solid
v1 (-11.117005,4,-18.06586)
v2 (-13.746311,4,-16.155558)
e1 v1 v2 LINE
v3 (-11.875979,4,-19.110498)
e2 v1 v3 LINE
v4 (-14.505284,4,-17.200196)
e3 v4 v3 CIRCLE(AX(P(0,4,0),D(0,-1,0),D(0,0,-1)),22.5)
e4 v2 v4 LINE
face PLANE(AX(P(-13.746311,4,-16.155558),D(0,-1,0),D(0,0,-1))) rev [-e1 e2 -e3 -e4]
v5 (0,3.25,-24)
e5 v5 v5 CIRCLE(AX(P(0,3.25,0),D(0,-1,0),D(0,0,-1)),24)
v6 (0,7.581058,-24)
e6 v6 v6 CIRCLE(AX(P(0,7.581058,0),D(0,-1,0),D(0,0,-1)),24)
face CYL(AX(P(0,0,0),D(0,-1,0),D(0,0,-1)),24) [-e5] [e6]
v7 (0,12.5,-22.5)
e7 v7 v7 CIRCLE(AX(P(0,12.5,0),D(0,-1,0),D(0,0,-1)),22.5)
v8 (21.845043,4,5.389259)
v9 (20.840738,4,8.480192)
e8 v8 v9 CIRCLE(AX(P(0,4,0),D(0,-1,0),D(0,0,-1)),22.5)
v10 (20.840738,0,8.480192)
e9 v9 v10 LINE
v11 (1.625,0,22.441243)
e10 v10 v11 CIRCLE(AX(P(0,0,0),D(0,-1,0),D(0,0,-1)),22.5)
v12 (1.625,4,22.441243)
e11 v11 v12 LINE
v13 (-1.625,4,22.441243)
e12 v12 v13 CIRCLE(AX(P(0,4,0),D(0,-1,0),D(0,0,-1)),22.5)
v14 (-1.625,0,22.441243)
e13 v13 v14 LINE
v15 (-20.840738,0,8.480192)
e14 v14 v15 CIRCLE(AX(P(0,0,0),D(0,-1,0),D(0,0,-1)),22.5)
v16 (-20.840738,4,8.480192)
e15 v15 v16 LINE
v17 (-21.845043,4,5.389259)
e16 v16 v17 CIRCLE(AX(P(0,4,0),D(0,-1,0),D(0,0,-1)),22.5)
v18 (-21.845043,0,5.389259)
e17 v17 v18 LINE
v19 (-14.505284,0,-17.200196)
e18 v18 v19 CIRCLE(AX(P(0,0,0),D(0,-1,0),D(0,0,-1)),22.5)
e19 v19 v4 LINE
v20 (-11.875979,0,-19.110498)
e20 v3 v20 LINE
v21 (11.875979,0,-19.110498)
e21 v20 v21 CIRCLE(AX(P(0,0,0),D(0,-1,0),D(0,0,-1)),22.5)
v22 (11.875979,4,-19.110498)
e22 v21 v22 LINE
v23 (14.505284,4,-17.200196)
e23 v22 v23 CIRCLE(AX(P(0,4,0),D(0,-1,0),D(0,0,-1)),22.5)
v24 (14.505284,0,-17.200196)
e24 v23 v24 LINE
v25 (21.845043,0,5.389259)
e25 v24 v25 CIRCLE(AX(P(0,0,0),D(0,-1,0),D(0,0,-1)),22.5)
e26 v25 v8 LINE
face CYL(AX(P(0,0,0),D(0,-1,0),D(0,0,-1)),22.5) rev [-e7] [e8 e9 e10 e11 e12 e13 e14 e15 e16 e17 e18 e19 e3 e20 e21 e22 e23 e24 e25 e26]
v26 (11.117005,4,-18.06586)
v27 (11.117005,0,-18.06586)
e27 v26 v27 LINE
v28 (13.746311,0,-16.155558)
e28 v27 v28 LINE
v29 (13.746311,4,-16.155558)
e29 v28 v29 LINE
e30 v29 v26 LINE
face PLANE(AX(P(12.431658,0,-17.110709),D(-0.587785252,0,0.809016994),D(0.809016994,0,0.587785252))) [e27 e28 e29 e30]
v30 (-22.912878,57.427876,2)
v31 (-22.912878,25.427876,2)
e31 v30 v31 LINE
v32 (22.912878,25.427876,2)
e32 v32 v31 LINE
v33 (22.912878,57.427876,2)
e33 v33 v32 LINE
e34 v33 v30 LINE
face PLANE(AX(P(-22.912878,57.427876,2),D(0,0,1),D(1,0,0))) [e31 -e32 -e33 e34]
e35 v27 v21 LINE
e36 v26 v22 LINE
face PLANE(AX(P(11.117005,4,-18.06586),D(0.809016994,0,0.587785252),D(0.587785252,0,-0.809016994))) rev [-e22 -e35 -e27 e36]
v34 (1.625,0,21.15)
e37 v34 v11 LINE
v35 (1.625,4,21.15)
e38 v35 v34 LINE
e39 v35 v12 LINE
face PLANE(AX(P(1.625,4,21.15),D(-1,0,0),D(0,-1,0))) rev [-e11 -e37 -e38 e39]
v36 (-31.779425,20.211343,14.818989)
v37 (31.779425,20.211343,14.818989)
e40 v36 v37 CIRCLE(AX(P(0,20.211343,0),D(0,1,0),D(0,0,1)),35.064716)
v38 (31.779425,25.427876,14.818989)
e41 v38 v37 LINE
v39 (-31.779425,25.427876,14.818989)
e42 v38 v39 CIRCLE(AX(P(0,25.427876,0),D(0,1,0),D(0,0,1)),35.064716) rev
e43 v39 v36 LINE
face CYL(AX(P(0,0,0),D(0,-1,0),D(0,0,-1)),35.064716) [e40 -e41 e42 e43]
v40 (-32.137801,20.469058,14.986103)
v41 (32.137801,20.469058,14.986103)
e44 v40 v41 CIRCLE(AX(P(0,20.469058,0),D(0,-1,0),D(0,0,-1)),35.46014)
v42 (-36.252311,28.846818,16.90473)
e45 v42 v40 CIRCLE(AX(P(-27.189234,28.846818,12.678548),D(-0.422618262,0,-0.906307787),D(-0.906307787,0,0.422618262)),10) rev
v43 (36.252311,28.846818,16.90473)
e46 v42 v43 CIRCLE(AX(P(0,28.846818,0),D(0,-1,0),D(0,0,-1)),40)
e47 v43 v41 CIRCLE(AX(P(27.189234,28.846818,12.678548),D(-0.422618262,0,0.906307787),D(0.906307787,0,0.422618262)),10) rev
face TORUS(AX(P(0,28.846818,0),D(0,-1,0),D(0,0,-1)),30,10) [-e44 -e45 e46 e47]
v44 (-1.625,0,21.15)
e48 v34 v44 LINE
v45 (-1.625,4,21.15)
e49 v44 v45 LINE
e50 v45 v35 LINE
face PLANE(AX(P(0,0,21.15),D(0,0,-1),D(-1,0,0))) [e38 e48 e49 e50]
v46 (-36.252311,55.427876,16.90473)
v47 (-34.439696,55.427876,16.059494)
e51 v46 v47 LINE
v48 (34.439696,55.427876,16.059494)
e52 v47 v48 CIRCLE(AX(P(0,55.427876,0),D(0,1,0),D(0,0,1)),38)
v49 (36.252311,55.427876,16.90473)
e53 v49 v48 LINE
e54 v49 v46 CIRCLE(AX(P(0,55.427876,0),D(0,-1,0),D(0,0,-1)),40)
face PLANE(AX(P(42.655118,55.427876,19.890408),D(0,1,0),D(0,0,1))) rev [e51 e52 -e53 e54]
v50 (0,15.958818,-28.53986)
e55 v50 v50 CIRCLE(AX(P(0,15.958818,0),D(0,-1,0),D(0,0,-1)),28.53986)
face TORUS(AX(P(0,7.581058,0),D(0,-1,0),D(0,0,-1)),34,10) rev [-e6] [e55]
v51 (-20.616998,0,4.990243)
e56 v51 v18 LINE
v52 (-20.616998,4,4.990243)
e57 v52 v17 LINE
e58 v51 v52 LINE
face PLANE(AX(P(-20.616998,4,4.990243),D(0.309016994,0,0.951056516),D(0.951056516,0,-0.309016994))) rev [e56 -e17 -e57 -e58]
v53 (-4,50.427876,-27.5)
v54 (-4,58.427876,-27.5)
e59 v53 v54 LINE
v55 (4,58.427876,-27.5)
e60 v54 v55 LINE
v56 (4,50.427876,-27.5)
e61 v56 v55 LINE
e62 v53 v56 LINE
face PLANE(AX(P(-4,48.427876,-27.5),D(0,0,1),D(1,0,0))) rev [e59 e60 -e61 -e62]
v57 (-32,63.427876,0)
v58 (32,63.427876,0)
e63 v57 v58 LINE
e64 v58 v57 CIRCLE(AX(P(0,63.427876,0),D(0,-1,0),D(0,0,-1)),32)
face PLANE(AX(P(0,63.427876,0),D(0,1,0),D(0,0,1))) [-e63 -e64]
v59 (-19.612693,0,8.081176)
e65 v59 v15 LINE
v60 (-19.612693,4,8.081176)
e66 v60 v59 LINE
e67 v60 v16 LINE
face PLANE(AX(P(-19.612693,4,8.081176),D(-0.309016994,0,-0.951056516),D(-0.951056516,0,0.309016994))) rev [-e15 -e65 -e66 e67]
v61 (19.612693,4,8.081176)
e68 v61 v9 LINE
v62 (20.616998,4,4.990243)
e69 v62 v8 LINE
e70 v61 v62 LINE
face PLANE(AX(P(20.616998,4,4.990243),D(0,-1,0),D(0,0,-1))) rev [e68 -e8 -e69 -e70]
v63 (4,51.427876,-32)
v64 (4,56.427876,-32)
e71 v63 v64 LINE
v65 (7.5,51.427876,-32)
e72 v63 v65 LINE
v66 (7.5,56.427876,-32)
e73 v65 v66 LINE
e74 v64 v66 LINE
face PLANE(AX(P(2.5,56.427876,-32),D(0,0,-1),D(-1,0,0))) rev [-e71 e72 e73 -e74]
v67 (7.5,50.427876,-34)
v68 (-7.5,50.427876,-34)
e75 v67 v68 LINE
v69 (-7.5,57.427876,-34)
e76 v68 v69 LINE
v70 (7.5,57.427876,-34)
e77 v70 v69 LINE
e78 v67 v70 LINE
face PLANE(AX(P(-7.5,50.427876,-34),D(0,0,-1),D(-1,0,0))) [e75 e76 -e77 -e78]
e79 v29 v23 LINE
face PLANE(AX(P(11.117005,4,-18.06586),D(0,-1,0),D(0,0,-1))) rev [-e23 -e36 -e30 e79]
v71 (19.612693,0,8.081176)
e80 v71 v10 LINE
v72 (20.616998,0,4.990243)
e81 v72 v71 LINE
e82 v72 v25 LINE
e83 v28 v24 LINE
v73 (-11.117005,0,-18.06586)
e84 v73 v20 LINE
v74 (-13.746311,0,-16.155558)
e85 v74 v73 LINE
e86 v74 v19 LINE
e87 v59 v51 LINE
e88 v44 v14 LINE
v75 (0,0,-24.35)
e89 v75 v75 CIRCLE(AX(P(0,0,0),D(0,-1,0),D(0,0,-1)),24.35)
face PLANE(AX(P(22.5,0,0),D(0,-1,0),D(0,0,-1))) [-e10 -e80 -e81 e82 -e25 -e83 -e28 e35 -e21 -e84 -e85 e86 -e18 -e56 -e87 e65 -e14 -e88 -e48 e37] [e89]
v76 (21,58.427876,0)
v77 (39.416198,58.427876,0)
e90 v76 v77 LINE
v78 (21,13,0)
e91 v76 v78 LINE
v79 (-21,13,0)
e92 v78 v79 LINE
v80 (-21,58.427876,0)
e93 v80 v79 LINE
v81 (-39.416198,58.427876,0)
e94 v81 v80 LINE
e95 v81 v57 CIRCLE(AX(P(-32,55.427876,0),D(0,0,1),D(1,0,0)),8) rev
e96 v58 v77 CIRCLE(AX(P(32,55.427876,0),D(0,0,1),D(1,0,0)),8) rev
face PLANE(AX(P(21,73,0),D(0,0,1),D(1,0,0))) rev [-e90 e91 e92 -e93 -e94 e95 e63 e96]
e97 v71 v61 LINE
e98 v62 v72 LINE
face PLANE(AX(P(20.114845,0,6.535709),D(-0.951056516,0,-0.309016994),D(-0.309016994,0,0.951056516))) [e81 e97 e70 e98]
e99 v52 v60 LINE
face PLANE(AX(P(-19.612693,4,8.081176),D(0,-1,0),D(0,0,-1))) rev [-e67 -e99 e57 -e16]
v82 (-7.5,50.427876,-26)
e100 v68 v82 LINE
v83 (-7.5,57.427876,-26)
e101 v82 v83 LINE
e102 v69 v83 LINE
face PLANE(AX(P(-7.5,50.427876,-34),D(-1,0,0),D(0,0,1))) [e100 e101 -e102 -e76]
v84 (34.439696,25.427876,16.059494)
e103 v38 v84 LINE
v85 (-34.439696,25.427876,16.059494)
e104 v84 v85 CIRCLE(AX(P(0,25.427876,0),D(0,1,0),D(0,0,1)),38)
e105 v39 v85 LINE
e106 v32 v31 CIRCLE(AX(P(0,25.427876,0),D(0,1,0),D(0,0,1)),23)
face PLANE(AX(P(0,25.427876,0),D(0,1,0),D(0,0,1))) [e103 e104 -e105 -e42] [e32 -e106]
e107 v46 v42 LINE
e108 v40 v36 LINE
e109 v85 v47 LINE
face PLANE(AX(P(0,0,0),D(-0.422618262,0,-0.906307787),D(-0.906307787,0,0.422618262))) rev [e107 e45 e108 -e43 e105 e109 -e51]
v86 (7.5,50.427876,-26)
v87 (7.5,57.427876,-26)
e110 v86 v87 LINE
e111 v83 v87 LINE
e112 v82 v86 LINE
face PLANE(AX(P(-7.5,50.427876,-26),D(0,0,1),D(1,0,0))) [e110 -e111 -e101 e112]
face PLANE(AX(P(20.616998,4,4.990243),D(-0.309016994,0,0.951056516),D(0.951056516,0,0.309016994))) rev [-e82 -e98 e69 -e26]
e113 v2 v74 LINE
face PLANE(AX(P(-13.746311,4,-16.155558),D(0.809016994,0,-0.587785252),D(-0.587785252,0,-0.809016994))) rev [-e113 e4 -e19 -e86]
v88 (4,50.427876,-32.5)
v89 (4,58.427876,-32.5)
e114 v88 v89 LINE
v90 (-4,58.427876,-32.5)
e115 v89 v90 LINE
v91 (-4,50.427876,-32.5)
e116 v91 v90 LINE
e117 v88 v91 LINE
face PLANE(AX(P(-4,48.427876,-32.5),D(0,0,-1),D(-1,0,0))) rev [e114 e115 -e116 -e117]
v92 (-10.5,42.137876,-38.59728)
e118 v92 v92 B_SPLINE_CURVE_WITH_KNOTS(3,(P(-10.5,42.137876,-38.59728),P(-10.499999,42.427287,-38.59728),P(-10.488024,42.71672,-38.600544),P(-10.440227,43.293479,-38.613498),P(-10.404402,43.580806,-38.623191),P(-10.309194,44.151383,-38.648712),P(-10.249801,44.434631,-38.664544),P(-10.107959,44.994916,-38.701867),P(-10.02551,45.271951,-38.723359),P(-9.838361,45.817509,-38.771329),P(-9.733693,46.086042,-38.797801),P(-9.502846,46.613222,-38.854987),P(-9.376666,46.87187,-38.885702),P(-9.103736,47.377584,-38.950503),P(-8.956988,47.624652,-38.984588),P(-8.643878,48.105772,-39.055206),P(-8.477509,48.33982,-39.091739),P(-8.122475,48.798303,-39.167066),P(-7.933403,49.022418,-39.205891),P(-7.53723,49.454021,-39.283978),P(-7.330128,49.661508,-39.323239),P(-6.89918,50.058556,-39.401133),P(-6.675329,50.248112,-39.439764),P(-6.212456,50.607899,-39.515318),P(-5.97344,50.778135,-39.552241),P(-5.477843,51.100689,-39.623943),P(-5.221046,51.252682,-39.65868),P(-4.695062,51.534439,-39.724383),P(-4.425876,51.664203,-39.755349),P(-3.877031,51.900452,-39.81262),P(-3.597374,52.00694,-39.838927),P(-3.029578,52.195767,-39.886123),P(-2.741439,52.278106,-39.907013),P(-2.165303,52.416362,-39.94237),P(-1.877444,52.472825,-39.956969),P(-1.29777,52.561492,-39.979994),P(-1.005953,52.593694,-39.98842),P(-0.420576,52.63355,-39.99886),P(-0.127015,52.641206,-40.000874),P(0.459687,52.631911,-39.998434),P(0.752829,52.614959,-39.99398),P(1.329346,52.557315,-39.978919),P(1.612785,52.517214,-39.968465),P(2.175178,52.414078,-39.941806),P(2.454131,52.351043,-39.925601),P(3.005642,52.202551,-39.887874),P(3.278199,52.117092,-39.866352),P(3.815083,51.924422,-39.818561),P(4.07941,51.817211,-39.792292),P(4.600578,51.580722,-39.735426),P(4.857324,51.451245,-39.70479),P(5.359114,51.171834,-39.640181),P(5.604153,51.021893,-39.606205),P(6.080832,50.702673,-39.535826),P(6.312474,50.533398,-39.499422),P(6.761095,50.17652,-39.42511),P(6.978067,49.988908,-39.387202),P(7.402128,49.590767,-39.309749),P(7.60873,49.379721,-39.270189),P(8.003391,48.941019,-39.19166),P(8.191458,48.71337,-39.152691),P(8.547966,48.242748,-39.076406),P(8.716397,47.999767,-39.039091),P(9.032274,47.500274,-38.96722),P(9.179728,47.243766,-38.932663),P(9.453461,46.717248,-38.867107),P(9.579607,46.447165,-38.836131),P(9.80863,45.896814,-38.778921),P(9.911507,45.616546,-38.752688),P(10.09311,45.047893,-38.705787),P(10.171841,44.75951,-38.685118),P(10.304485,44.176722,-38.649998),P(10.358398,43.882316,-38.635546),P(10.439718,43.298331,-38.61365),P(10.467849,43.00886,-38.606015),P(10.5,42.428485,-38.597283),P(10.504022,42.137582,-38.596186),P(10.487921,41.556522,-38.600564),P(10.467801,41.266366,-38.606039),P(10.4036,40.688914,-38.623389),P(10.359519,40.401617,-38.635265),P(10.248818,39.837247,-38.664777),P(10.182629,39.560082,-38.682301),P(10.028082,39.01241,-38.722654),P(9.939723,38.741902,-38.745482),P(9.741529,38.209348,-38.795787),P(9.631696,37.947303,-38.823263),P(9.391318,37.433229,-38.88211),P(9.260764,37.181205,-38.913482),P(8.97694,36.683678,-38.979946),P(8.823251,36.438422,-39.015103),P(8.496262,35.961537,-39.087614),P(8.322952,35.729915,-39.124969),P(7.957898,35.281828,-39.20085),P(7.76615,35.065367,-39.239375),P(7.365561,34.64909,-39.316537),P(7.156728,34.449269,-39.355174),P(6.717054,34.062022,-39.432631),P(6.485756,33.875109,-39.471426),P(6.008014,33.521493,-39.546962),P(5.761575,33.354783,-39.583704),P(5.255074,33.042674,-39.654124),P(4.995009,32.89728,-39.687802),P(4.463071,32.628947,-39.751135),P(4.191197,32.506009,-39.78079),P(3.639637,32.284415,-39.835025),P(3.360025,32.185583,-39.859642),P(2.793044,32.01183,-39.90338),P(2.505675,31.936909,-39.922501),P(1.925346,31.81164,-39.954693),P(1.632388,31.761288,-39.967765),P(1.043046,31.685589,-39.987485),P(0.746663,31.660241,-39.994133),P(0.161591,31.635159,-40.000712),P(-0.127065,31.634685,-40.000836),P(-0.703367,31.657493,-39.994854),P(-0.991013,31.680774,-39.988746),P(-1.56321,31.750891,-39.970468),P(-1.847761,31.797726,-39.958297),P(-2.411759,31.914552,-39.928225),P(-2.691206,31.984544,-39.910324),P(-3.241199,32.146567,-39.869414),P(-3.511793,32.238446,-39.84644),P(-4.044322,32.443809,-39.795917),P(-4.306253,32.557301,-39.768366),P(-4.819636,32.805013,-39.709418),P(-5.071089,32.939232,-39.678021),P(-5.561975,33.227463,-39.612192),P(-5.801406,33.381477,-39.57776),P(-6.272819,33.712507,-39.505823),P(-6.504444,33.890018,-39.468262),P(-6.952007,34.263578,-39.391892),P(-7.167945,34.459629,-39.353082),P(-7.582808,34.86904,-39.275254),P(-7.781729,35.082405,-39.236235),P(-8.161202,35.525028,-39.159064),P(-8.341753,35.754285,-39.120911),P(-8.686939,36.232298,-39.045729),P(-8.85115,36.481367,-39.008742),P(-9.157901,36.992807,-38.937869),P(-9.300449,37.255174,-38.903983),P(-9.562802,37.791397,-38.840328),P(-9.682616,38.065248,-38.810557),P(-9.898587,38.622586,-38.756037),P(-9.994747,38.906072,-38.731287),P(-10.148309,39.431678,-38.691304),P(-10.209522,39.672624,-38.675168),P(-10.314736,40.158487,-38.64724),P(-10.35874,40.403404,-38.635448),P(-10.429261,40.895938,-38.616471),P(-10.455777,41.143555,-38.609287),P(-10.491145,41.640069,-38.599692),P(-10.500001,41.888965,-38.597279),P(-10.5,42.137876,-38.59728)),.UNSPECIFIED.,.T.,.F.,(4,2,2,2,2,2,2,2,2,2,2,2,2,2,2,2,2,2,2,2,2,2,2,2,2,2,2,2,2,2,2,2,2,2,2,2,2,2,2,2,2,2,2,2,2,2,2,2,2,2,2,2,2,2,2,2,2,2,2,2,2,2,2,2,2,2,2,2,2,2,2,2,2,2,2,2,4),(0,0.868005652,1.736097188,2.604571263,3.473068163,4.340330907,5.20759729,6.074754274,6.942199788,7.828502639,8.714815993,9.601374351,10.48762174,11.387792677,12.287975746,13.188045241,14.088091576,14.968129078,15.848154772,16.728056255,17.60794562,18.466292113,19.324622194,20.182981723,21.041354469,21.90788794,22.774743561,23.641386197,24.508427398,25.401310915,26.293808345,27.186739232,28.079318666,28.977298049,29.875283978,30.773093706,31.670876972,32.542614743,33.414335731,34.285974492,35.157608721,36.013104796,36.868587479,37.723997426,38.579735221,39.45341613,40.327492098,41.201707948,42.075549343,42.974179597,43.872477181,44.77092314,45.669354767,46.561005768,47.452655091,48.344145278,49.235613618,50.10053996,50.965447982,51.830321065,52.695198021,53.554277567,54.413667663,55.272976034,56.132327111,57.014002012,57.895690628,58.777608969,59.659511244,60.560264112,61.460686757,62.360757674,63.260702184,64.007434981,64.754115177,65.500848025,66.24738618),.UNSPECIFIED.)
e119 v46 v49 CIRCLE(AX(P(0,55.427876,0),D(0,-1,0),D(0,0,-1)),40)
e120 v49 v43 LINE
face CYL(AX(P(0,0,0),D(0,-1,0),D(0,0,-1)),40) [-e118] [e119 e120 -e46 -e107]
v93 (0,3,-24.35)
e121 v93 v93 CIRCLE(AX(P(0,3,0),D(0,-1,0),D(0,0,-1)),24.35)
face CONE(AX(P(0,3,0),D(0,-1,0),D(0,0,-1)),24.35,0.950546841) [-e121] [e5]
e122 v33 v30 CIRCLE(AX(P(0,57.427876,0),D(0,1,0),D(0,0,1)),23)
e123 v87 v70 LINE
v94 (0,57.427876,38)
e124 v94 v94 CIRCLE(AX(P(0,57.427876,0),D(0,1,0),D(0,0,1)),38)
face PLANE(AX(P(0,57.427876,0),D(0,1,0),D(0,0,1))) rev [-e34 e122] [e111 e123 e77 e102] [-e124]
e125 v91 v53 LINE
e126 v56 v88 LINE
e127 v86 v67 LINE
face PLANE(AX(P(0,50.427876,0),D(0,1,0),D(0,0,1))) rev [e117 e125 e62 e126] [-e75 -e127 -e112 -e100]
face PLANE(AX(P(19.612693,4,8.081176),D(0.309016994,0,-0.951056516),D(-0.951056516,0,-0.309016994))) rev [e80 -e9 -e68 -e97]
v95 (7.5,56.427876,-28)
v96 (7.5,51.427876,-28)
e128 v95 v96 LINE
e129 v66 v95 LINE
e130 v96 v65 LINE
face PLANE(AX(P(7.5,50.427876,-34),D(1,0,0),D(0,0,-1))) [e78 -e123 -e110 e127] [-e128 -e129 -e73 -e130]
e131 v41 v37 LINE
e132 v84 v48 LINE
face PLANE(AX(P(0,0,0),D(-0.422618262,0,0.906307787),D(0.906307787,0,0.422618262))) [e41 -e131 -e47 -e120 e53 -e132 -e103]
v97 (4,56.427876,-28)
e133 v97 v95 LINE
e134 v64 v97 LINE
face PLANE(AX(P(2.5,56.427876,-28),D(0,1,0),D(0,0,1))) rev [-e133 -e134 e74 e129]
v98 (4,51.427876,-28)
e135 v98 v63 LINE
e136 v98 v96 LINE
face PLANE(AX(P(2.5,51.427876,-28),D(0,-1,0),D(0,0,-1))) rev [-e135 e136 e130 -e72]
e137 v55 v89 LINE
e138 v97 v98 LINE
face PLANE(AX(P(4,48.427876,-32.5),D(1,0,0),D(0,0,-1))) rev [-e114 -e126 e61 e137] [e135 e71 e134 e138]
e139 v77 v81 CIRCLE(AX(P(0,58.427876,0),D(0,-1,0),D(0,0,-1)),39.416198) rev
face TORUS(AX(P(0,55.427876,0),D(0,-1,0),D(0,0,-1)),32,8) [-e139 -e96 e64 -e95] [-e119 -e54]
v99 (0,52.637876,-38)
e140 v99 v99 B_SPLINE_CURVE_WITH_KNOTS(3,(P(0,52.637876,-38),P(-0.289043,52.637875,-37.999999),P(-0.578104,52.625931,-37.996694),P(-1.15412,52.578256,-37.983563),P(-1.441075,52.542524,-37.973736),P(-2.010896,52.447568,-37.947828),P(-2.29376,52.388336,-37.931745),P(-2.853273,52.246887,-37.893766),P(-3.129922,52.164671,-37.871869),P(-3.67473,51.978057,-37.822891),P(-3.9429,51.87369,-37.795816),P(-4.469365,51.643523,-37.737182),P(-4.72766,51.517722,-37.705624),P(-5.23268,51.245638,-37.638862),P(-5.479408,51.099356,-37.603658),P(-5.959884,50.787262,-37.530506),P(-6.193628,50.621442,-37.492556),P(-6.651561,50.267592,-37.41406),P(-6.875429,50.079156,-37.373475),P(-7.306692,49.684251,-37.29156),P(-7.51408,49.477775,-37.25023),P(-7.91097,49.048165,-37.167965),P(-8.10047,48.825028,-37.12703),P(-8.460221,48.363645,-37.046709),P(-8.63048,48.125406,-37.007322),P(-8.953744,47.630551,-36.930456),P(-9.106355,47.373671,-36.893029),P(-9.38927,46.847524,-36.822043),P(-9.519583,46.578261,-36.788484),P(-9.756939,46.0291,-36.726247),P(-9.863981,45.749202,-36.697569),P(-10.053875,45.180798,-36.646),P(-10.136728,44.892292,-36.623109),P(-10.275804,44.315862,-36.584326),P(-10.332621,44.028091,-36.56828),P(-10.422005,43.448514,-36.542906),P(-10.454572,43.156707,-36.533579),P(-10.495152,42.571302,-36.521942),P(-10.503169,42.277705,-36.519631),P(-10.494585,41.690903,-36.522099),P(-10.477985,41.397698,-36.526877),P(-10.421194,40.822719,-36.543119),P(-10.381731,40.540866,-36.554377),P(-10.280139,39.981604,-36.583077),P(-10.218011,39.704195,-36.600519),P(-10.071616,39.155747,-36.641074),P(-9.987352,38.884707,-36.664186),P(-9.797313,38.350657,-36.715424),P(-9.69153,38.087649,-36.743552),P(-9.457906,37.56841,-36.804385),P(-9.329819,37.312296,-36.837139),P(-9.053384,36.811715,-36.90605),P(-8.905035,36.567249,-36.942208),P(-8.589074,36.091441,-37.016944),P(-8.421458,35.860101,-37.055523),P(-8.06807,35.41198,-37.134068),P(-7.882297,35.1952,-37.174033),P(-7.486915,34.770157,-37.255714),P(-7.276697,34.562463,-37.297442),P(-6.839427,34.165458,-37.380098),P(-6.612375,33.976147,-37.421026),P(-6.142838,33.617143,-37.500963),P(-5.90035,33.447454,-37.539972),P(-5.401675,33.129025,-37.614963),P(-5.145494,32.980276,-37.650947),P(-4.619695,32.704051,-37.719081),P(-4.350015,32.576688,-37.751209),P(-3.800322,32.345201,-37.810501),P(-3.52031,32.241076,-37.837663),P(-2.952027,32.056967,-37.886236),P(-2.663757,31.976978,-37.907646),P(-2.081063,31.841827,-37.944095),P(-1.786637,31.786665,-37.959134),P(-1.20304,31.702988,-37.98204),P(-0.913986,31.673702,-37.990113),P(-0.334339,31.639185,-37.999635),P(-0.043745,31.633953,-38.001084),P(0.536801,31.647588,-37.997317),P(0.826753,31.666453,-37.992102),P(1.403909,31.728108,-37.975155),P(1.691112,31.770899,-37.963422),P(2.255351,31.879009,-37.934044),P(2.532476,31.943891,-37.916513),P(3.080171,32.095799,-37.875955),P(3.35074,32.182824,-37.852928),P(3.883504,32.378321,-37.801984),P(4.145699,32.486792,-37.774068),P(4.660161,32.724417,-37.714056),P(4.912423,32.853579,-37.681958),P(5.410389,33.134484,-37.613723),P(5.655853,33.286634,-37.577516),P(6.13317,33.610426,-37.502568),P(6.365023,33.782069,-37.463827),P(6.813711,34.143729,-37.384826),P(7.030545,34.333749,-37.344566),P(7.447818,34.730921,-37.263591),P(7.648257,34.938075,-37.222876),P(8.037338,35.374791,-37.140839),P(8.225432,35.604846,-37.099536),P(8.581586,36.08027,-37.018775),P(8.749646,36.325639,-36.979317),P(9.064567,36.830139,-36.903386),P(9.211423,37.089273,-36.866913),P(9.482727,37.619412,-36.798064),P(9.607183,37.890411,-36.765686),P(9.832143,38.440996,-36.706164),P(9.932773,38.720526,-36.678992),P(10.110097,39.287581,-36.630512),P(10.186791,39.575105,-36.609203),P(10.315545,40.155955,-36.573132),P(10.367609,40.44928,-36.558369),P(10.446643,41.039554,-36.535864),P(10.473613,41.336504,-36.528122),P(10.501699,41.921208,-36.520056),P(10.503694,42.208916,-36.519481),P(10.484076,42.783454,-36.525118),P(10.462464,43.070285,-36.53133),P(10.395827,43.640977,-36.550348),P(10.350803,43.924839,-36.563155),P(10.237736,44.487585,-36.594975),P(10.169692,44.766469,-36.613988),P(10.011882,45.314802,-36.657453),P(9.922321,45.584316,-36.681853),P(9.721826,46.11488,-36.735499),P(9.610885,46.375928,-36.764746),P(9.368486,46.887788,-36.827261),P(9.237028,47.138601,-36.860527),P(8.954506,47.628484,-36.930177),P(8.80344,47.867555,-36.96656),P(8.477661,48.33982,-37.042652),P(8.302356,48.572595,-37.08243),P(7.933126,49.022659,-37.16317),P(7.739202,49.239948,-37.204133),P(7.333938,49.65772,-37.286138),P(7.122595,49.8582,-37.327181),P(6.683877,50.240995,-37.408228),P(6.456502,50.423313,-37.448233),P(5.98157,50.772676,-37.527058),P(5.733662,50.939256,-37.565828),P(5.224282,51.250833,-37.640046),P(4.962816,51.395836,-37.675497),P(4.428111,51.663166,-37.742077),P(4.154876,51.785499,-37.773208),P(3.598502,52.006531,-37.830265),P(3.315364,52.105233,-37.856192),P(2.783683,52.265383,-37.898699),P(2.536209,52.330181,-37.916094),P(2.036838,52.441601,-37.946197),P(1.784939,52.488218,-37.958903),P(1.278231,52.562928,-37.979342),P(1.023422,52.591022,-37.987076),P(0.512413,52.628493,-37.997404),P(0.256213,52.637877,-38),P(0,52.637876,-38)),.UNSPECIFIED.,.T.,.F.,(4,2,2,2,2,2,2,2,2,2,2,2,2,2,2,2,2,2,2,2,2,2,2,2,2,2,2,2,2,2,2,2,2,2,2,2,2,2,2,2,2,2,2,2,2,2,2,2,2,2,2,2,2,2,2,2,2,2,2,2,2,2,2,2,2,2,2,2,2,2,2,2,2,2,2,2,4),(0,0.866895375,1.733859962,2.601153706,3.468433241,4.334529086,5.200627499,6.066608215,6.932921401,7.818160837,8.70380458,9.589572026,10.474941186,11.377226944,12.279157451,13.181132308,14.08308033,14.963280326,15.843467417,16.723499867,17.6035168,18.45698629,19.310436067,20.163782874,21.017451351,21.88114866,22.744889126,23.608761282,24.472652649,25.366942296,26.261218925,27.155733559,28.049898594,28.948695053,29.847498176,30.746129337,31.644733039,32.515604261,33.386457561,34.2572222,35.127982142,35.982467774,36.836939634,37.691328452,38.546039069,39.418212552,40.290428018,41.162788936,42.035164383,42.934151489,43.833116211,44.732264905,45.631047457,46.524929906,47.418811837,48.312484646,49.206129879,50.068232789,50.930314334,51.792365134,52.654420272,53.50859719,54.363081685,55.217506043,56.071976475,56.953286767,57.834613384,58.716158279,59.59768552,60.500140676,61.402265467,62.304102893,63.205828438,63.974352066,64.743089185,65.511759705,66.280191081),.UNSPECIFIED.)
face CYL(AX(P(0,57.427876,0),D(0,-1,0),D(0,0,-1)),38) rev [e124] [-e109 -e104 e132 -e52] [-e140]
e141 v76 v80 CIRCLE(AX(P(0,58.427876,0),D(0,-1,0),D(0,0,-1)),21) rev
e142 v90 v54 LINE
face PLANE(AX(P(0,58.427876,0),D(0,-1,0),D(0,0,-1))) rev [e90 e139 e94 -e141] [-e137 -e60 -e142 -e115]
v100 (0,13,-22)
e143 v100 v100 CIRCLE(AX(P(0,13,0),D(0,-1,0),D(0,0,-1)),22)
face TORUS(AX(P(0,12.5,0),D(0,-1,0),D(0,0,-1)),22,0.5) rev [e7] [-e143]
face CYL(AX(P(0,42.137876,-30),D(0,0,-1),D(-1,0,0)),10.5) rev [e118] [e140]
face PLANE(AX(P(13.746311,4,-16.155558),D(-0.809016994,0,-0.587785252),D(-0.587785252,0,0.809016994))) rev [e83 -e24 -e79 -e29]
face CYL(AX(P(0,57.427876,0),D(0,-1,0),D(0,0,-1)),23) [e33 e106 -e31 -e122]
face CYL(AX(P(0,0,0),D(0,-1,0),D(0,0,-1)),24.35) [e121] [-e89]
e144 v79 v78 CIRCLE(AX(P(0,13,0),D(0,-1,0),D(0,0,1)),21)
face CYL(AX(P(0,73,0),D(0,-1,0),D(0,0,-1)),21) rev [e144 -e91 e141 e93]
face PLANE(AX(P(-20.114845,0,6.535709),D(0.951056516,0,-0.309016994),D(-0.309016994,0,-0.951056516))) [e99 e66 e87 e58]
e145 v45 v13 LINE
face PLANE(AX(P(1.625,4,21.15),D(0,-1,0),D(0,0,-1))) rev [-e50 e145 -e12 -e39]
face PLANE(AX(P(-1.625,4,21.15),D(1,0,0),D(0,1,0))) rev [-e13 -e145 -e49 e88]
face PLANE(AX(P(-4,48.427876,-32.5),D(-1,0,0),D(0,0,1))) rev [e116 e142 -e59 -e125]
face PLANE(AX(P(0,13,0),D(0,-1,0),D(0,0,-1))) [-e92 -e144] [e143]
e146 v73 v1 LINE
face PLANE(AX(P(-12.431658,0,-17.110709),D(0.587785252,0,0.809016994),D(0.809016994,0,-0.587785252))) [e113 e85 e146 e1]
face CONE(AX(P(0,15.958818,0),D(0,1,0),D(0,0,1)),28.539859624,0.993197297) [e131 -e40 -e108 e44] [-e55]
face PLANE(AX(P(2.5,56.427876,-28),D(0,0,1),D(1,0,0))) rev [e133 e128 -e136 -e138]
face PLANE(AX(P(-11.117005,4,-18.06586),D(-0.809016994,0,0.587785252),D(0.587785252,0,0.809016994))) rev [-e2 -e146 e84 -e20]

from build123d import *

# Parameters (mm, degrees)
CUT_EXTRUDE3_DEPTH           = 60
CUT_EXTRUDE5_DEPTH           = 2
CUT_EXTRUDE5_DEPTH_BACK      = 30
SKETCH9_R                    = 38
SKETCH9_R_2                  = 23
SKETCH19_W                   = 12
SKETCH19_H                   = 36.5
CUT_REVOLVE2_ANGLE           = 65
CUT_REVOLVE2_OTHER_WAY_ANGLE = 65
SKETCH21_W                   = 3.25
SKETCH21_H                   = 4
BOSS_EXTRUDE3_DEPTH          = 1.35
CIRPATTERN1_COUNT            = 5
CUT_EXTRUDE9_START           = -5
CUT_EXTRUDE9_DEPTH           = 5
SKETCH23_R                   = 10.5
CUT_EXTRUDE10_DEPTH          = 10
SKETCH24_W                   = 15
SKETCH24_H                   = 8
BOSS_EXTRUDE4_DEPTH          = 8
SKETCH26_W                   = 8
SKETCH26_H                   = 5
CUT_EXTRUDE11_DEPTH          = 10
SKETCH27_W                   = 4
SKETCH27_H                   = 5
CUT_EXTRUDE12_DEPTH          = 5
CUT_EXTRUDE14_DEPTH          = 2
CUT_EXTRUDE14_DEPTH_BACK     = 30


with BuildPart() as part:
    # Sketch1 → Revolve1 (revolve)
    with BuildSketch(Plane.XY):
        with BuildLine():
            Line((0, 63.427876097), (32, 63.427876097))
            ThreePointArc((32, 63.427876097), (37.656854249, 61.084730346), (40, 55.427876097))
            Line((40, 55.427876097), (40, 28.846818009))
            ThreePointArc((40, 28.846818009), (38.792081772, 24.082439968), (35.460140376, 20.469057744))
            Line((35.460140376, 20.469057744), (28.539859624, 15.958818353))
            ThreePointArc((28.539859624, 15.958818353), (25.207918228, 12.345436129), (24, 7.581058088))
            Line((24, 7.581058088), (24, 3.25))
            Line((24, 3.25), (24.35, 3))
            Line((24.35, 3), (24.35, 0))
            Line((24.35, 0), (22.5, 0))
            Line((22.5, 0), (22.5, 12.5))
            ThreePointArc((22.5, 12.5), (22.353553391, 12.853553391), (22, 13))
            Line((22, 13), (0, 13))
            Line((0, 13), (0, 63.427876097))
        make_face()
    revolve(axis=Axis((0, 0, 0), (0, 1, 0)))

    # Sketch11 → Cut-Extrude3 (cut)
    with BuildSketch(Plane(origin=(0, 13, 0), x_dir=(-1, 0, 0), z_dir=(0, -1, 0))):
        with BuildLine():
            Line((-21, 0), (21, 0))
            ThreePointArc((21, 0), (0, 21), (-21, 0))
        make_face()
    extrude(amount=-CUT_EXTRUDE3_DEPTH, mode=Mode.SUBTRACT)

    # Sketch9 → Cut-Extrude5 (cut, two sides: drawn at the far end of the back side and taken through both)
    with BuildSketch(Plane(origin=(0, 55.427876097, 0), x_dir=(1, 0, 0), z_dir=(0, 1, 0)).offset(-CUT_EXTRUDE5_DEPTH_BACK)):
        Circle(SKETCH9_R)
        Circle(SKETCH9_R_2, mode=Mode.SUBTRACT)
    extrude(amount=CUT_EXTRUDE5_DEPTH + CUT_EXTRUDE5_DEPTH_BACK, mode=Mode.SUBTRACT)

    # Sketch19 → Cut-Revolve2 (revolve, cut)
    with BuildSketch(Plane(origin=(0, 0, 0), x_dir=(0, 0, -1), z_dir=(1, 0, 0))):
        with Locations((-41.064715832, 37.177876097)):
            Rectangle(SKETCH19_W, SKETCH19_H)
    revolve(axis=Axis((0, 0, 0), (0, 1, 0)), revolution_arc=CUT_REVOLVE2_ANGLE, mode=Mode.SUBTRACT)

    # Sketch19 → Cut-Revolve2 other way (revolve, cut)
    with BuildSketch(Plane(origin=(0, 0, 0), x_dir=(0, 0, -1), z_dir=(1, 0, 0))):
        with Locations((-41.064715832, 37.177876097)):
            Rectangle(SKETCH19_W, SKETCH19_H)
    revolve(axis=Axis((0, 0, 0), (0, -1, 0)), revolution_arc=CUT_REVOLVE2_OTHER_WAY_ANGLE, mode=Mode.SUBTRACT)

    # Sketch21 → Boss-Extrude3 (add)
    with BuildSketch(Plane(origin=(0, 0, 22.5), x_dir=(-1, 0, 0), z_dir=(0, 0, -1))):
        with Locations((0, 2)):
            Rectangle(SKETCH21_W, SKETCH21_H)
    boss_extrude3 = extrude(amount=BOSS_EXTRUDE3_DEPTH)

    # CirPattern1: Boss-Extrude3 ×5 about axis
    cirpattern1_axis = Axis((0, 0, 0), (0, -1, 0))
    for i in range(1, CIRPATTERN1_COUNT):
        add(boss_extrude3.rotate(cirpattern1_axis, i * 360 / CIRPATTERN1_COUNT))

    # Sketch22 → Cut-Extrude9 (cut)
    with BuildSketch(Plane(origin=(0, 63.427876097, 0), x_dir=(1, 0, 0), z_dir=(0, 1, 0)).offset(CUT_EXTRUDE9_START)):
        with BuildLine():
            Line((-40, 0), (40, 0))
            ThreePointArc((40, 0), (0, 40), (-40, 0))
        make_face()
    extrude(amount=CUT_EXTRUDE9_DEPTH, mode=Mode.SUBTRACT)

    # Sketch23 → Cut-Extrude10 (cut)
    with BuildSketch(Plane(origin=(0, 0, -40), x_dir=(-1, 0, 0), z_dir=(0, 0, -1))):
        with Locations((0, 42.137876097)):
            Circle(SKETCH23_R)
    extrude(amount=-CUT_EXTRUDE10_DEPTH, mode=Mode.SUBTRACT)

    # Sketch24 → Boss-Extrude4 (add)
    with BuildSketch(Plane(origin=(0, 58.427876097, 0), x_dir=(1, 0, 0), z_dir=(0, 1, 0))):
        with Locations((0, 30)):
            Rectangle(SKETCH24_W, SKETCH24_H)
    extrude(amount=-BOSS_EXTRUDE4_DEPTH)

    # Sketch26 → Cut-Extrude11 (cut)
    with BuildSketch(Plane(origin=(0, 58.427876097, 0), x_dir=(1, 0, 0), z_dir=(0, 1, 0))):
        with Locations((0, 30)):
            Rectangle(SKETCH26_W, SKETCH26_H)
    extrude(amount=-CUT_EXTRUDE11_DEPTH, mode=Mode.SUBTRACT)

    # Sketch27 → Cut-Extrude12 (cut)
    with BuildSketch(Plane(origin=(7.5, 0, 0), x_dir=(0, 0, -1), z_dir=(1, 0, 0))):
        with Locations((30, 53.927876097)):
            Rectangle(SKETCH27_W, SKETCH27_H)
    extrude(amount=-CUT_EXTRUDE12_DEPTH, mode=Mode.SUBTRACT)

    # Sketch28 → Cut-Extrude14 (cut, two sides: drawn at the far end of the back side and taken through both)
    with BuildSketch(Plane(origin=(0, 55.427876097, 0), x_dir=(1, 0, 0), z_dir=(0, 1, 0)).offset(-CUT_EXTRUDE14_DEPTH_BACK)):
        with BuildLine():
            Line((-22.912878475, -2), (22.912878475, -2))
            ThreePointArc((22.912878475, -2), (0, -23), (-22.912878475, -2))
        make_face()
    extrude(amount=CUT_EXTRUDE14_DEPTH + CUT_EXTRUDE14_DEPTH_BACK, mode=Mode.SUBTRACT)


solid = part.part
